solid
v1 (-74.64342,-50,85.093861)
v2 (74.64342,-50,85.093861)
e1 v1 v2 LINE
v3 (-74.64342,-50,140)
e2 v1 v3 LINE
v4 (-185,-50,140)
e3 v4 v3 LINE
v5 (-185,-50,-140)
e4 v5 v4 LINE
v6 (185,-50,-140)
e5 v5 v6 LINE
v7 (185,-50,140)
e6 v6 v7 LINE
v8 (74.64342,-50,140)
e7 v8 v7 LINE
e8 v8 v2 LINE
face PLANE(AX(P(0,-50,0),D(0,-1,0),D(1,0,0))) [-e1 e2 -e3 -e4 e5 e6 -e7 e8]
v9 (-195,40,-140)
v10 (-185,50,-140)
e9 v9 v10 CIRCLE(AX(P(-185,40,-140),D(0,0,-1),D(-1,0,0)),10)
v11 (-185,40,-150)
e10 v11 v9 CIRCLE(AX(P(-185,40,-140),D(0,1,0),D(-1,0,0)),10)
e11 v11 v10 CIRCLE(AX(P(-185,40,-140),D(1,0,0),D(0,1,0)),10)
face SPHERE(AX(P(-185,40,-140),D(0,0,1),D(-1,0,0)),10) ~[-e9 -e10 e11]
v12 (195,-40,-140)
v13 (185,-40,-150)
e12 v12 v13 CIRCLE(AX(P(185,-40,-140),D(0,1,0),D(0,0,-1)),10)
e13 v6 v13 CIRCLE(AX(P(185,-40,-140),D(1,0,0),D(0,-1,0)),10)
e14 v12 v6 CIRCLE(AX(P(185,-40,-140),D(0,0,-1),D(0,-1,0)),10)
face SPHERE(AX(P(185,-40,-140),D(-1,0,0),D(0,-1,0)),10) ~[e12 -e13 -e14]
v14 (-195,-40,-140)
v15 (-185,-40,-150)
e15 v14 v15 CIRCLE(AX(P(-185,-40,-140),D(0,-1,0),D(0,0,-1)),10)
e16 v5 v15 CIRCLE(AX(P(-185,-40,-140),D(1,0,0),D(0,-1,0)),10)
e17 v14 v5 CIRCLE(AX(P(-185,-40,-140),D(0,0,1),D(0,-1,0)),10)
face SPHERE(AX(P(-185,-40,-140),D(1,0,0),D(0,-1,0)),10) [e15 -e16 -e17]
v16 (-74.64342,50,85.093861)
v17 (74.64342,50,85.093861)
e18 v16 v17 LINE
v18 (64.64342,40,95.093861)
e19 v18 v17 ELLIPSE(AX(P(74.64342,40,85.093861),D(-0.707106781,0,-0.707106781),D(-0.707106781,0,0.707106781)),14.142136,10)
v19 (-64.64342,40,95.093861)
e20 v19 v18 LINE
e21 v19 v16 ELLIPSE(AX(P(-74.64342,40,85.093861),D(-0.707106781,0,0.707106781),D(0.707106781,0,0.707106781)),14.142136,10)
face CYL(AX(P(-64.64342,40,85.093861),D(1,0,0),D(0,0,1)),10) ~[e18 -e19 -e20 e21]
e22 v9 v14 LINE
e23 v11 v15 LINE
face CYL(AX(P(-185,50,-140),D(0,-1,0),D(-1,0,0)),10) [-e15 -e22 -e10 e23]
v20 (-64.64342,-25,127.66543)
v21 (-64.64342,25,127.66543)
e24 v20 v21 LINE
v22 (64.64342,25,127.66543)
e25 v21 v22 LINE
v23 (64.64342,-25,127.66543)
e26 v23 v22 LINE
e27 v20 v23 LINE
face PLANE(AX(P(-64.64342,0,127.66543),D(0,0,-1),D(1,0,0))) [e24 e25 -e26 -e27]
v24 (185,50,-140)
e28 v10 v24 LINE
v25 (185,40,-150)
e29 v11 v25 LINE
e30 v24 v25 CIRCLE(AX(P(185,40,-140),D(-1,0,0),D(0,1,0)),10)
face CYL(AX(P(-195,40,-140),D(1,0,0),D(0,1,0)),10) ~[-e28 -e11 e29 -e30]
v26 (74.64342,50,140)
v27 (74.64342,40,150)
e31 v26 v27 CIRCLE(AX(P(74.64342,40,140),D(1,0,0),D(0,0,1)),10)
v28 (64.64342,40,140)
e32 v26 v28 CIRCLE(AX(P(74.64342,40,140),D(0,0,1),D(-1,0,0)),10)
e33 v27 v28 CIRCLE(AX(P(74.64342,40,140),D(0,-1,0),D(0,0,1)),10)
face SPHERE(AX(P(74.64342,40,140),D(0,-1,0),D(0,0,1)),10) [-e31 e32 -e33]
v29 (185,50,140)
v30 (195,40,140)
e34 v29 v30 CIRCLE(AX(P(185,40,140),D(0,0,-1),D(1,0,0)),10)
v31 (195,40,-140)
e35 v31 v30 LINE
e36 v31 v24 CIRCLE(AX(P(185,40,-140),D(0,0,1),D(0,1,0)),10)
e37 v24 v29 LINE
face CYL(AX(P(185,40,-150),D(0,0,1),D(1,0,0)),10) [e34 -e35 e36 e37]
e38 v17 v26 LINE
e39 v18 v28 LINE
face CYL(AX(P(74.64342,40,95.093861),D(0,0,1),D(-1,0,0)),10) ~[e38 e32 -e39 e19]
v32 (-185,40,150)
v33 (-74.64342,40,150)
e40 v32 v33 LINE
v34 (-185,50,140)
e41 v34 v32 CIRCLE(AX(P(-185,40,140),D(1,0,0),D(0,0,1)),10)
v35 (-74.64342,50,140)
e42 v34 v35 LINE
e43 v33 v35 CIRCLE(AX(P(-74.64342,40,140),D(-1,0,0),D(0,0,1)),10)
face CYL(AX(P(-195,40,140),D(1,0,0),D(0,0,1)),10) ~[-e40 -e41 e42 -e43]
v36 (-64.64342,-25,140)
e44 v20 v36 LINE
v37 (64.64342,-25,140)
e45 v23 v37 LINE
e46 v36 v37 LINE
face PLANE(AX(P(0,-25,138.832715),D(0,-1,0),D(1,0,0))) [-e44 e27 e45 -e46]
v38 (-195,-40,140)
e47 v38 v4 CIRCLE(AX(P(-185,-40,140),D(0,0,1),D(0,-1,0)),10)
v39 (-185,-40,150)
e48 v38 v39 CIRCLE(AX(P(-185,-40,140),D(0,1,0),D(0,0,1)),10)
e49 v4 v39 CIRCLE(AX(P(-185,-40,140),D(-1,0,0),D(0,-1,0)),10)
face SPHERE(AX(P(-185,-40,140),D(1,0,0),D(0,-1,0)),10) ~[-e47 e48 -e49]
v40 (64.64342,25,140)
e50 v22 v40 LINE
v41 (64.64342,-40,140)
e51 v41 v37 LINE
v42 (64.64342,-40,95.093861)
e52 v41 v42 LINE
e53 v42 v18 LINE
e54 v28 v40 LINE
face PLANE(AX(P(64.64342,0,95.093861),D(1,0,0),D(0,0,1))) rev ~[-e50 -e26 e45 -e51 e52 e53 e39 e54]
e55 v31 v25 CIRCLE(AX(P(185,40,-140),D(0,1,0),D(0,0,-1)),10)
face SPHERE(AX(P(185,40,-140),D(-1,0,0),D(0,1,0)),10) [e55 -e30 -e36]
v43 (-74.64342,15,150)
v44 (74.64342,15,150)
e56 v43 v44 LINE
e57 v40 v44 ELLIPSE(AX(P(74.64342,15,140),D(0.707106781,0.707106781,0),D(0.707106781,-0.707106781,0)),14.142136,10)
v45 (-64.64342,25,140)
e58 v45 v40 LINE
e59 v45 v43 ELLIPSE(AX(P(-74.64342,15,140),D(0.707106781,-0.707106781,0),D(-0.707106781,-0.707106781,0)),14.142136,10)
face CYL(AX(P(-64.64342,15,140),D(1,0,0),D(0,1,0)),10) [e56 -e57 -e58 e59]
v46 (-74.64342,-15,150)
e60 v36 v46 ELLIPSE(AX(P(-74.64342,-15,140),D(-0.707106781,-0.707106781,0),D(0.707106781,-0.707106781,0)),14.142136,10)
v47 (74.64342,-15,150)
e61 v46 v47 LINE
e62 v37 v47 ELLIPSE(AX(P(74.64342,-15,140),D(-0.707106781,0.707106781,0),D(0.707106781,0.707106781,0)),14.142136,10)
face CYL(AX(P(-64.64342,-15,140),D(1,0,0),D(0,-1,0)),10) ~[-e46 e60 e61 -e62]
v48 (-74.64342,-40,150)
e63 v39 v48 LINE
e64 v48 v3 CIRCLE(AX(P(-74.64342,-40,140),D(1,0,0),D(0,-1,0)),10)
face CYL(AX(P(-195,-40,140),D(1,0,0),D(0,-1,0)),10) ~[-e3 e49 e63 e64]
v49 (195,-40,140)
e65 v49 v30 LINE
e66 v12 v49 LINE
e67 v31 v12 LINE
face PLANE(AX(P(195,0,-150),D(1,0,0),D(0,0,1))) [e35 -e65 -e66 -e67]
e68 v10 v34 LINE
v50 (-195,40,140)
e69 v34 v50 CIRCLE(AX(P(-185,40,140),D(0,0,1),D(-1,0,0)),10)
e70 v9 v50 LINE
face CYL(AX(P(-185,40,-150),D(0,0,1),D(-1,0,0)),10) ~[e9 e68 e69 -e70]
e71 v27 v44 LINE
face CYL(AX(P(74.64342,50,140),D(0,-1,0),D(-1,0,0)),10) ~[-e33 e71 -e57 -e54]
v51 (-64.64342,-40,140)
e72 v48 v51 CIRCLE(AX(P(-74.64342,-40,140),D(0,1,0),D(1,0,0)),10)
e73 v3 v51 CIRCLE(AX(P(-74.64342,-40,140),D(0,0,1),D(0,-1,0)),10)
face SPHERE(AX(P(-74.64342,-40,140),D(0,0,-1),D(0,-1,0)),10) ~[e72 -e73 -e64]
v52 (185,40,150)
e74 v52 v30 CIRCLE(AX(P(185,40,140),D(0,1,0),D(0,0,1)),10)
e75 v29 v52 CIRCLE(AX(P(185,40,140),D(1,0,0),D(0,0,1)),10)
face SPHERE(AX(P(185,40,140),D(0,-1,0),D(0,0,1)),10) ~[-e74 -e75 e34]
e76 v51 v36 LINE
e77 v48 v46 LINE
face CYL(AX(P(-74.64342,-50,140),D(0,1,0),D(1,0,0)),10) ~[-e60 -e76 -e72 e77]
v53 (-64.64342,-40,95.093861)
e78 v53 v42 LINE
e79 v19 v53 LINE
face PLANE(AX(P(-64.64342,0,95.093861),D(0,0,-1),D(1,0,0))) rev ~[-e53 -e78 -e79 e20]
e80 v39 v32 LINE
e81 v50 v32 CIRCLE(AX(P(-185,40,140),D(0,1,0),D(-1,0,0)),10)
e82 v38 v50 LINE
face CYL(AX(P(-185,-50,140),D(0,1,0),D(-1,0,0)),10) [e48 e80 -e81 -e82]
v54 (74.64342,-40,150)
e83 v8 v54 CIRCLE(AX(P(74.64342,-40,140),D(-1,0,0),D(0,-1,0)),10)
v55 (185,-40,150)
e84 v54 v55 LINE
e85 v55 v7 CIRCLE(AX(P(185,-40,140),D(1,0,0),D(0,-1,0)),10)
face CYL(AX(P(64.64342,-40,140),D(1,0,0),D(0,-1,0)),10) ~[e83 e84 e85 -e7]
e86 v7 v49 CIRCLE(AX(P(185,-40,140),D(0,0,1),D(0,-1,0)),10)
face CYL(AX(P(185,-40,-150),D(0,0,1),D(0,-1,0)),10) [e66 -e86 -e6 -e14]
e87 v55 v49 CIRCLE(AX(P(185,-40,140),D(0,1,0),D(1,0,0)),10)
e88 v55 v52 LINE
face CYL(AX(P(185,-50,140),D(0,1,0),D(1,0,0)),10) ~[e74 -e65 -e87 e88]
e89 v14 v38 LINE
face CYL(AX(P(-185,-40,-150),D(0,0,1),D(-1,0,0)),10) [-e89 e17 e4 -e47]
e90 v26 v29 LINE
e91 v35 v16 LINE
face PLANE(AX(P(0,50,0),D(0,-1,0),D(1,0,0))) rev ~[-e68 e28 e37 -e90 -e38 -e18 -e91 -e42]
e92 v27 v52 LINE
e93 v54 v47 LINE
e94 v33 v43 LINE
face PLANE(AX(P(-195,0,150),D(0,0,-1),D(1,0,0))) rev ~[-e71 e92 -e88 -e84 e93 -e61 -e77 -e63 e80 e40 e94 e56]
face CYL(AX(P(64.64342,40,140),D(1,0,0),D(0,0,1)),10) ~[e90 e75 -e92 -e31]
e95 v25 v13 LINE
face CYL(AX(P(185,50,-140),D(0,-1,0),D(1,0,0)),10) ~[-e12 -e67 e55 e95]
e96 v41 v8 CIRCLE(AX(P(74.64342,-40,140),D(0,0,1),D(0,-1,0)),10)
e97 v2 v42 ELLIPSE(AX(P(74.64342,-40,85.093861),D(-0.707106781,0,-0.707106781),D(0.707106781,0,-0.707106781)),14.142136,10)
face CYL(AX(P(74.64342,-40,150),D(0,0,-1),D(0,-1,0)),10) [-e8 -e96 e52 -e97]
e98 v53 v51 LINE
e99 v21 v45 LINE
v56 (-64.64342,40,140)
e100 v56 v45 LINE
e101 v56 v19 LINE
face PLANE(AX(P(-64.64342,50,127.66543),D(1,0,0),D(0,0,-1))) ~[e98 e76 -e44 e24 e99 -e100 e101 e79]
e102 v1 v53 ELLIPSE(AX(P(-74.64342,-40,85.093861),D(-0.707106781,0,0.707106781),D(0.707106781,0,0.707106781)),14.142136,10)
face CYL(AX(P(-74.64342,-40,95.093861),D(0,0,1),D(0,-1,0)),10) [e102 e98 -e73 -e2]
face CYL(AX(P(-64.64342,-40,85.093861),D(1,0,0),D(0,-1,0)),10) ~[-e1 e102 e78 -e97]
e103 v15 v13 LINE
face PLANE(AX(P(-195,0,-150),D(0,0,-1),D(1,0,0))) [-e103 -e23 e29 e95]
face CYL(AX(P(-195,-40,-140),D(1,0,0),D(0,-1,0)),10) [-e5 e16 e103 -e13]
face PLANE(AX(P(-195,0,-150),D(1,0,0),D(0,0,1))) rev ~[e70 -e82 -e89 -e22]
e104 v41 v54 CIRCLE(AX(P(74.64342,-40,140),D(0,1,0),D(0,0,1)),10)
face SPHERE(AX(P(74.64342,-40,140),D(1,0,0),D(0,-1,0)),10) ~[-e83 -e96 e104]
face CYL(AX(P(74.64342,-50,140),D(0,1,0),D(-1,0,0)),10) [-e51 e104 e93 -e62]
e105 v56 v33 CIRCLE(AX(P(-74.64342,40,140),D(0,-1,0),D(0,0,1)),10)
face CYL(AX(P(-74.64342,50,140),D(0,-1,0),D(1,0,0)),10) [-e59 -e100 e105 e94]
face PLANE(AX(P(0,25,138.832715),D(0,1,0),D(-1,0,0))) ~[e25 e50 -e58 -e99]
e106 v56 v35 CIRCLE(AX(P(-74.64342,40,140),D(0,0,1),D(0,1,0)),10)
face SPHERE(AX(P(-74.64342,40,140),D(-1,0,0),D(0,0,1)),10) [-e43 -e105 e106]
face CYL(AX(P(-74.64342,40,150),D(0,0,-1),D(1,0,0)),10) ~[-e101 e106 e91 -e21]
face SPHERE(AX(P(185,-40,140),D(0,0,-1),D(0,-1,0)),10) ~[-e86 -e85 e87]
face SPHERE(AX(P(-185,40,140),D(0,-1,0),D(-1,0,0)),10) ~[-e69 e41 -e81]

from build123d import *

# Parameters (mm, degrees)
F0_W     = 390
F0_H     = 300
F0_W_2   = 129.2868405581
F0_H_2   = 32.5715690851
F1_DEPTH = 50
F2_W     = 129.2868405581
F2_H     = 22.3345696926
F3_DEPTH = 25
F4_R     = 10


# Not quite as in the source:
# - a pattern or mirror of a feature is missing from the dataset's text; its kind, count and spacing are read off the source's solid


with BuildPart() as f1:
    # F0 (on Front) → F1 (new body, symmetric)
    with BuildSketch(Plane.XZ):
        Rectangle(F0_W, F0_H)
        with Locations((0, 111.3796457648)):
            Rectangle(F0_W_2, F0_H_2, mode=Mode.SUBTRACT)
    extrude(amount=F1_DEPTH, both=True)

    # F2 (on face) → F3 (cut)
    with BuildSketch(Plane.XZ.offset(50)):
        with Locations((0, 138.8327151537)):
            Rectangle(F2_W, F2_H)
    f3 = extrude(amount=-F3_DEPTH, mode=Mode.SUBTRACT)

    # F3_copies: F3 across plane
    add(f3.mirror(Plane.ZX), mode=Mode.SUBTRACT)

    # F4
    f4_edges = [f1.edges().sort_by_distance(p)[0] for p in [
        (0, -50, -150),
        (195, -50, 0),
        (129.82171, -50, 150),
        (64.64342, -50, 122.546931),
        (0, -50, 95.093861),
        (-64.64342, -50, 122.546931),
        (-129.82171, -50, 150),
        (-195, -50, 0),
        (-195, 0, 150),
        (-195, 50, 0),
        (-195, 0, -150),
        (195, 0, 150),
        (64.64342, -37.5, 150),
        (0, -25, 150),
        (-64.64342, -37.5, 150),
        (-129.82171, 50, 150),
        (-64.64342, 37.5, 150),
        (0, 25, 150),
        (64.64342, 37.5, 150),
        (129.82171, 50, 150),
        (0, 50, -150),
        (195, 50, 0),
        (64.64342, 50, 122.546931),
        (0, 50, 95.093861),
        (-64.64342, 50, 122.546931),
        (195, 0, -150),
    ]]
    fillet(f4_edges, radius=F4_R)


solid = f1.part
